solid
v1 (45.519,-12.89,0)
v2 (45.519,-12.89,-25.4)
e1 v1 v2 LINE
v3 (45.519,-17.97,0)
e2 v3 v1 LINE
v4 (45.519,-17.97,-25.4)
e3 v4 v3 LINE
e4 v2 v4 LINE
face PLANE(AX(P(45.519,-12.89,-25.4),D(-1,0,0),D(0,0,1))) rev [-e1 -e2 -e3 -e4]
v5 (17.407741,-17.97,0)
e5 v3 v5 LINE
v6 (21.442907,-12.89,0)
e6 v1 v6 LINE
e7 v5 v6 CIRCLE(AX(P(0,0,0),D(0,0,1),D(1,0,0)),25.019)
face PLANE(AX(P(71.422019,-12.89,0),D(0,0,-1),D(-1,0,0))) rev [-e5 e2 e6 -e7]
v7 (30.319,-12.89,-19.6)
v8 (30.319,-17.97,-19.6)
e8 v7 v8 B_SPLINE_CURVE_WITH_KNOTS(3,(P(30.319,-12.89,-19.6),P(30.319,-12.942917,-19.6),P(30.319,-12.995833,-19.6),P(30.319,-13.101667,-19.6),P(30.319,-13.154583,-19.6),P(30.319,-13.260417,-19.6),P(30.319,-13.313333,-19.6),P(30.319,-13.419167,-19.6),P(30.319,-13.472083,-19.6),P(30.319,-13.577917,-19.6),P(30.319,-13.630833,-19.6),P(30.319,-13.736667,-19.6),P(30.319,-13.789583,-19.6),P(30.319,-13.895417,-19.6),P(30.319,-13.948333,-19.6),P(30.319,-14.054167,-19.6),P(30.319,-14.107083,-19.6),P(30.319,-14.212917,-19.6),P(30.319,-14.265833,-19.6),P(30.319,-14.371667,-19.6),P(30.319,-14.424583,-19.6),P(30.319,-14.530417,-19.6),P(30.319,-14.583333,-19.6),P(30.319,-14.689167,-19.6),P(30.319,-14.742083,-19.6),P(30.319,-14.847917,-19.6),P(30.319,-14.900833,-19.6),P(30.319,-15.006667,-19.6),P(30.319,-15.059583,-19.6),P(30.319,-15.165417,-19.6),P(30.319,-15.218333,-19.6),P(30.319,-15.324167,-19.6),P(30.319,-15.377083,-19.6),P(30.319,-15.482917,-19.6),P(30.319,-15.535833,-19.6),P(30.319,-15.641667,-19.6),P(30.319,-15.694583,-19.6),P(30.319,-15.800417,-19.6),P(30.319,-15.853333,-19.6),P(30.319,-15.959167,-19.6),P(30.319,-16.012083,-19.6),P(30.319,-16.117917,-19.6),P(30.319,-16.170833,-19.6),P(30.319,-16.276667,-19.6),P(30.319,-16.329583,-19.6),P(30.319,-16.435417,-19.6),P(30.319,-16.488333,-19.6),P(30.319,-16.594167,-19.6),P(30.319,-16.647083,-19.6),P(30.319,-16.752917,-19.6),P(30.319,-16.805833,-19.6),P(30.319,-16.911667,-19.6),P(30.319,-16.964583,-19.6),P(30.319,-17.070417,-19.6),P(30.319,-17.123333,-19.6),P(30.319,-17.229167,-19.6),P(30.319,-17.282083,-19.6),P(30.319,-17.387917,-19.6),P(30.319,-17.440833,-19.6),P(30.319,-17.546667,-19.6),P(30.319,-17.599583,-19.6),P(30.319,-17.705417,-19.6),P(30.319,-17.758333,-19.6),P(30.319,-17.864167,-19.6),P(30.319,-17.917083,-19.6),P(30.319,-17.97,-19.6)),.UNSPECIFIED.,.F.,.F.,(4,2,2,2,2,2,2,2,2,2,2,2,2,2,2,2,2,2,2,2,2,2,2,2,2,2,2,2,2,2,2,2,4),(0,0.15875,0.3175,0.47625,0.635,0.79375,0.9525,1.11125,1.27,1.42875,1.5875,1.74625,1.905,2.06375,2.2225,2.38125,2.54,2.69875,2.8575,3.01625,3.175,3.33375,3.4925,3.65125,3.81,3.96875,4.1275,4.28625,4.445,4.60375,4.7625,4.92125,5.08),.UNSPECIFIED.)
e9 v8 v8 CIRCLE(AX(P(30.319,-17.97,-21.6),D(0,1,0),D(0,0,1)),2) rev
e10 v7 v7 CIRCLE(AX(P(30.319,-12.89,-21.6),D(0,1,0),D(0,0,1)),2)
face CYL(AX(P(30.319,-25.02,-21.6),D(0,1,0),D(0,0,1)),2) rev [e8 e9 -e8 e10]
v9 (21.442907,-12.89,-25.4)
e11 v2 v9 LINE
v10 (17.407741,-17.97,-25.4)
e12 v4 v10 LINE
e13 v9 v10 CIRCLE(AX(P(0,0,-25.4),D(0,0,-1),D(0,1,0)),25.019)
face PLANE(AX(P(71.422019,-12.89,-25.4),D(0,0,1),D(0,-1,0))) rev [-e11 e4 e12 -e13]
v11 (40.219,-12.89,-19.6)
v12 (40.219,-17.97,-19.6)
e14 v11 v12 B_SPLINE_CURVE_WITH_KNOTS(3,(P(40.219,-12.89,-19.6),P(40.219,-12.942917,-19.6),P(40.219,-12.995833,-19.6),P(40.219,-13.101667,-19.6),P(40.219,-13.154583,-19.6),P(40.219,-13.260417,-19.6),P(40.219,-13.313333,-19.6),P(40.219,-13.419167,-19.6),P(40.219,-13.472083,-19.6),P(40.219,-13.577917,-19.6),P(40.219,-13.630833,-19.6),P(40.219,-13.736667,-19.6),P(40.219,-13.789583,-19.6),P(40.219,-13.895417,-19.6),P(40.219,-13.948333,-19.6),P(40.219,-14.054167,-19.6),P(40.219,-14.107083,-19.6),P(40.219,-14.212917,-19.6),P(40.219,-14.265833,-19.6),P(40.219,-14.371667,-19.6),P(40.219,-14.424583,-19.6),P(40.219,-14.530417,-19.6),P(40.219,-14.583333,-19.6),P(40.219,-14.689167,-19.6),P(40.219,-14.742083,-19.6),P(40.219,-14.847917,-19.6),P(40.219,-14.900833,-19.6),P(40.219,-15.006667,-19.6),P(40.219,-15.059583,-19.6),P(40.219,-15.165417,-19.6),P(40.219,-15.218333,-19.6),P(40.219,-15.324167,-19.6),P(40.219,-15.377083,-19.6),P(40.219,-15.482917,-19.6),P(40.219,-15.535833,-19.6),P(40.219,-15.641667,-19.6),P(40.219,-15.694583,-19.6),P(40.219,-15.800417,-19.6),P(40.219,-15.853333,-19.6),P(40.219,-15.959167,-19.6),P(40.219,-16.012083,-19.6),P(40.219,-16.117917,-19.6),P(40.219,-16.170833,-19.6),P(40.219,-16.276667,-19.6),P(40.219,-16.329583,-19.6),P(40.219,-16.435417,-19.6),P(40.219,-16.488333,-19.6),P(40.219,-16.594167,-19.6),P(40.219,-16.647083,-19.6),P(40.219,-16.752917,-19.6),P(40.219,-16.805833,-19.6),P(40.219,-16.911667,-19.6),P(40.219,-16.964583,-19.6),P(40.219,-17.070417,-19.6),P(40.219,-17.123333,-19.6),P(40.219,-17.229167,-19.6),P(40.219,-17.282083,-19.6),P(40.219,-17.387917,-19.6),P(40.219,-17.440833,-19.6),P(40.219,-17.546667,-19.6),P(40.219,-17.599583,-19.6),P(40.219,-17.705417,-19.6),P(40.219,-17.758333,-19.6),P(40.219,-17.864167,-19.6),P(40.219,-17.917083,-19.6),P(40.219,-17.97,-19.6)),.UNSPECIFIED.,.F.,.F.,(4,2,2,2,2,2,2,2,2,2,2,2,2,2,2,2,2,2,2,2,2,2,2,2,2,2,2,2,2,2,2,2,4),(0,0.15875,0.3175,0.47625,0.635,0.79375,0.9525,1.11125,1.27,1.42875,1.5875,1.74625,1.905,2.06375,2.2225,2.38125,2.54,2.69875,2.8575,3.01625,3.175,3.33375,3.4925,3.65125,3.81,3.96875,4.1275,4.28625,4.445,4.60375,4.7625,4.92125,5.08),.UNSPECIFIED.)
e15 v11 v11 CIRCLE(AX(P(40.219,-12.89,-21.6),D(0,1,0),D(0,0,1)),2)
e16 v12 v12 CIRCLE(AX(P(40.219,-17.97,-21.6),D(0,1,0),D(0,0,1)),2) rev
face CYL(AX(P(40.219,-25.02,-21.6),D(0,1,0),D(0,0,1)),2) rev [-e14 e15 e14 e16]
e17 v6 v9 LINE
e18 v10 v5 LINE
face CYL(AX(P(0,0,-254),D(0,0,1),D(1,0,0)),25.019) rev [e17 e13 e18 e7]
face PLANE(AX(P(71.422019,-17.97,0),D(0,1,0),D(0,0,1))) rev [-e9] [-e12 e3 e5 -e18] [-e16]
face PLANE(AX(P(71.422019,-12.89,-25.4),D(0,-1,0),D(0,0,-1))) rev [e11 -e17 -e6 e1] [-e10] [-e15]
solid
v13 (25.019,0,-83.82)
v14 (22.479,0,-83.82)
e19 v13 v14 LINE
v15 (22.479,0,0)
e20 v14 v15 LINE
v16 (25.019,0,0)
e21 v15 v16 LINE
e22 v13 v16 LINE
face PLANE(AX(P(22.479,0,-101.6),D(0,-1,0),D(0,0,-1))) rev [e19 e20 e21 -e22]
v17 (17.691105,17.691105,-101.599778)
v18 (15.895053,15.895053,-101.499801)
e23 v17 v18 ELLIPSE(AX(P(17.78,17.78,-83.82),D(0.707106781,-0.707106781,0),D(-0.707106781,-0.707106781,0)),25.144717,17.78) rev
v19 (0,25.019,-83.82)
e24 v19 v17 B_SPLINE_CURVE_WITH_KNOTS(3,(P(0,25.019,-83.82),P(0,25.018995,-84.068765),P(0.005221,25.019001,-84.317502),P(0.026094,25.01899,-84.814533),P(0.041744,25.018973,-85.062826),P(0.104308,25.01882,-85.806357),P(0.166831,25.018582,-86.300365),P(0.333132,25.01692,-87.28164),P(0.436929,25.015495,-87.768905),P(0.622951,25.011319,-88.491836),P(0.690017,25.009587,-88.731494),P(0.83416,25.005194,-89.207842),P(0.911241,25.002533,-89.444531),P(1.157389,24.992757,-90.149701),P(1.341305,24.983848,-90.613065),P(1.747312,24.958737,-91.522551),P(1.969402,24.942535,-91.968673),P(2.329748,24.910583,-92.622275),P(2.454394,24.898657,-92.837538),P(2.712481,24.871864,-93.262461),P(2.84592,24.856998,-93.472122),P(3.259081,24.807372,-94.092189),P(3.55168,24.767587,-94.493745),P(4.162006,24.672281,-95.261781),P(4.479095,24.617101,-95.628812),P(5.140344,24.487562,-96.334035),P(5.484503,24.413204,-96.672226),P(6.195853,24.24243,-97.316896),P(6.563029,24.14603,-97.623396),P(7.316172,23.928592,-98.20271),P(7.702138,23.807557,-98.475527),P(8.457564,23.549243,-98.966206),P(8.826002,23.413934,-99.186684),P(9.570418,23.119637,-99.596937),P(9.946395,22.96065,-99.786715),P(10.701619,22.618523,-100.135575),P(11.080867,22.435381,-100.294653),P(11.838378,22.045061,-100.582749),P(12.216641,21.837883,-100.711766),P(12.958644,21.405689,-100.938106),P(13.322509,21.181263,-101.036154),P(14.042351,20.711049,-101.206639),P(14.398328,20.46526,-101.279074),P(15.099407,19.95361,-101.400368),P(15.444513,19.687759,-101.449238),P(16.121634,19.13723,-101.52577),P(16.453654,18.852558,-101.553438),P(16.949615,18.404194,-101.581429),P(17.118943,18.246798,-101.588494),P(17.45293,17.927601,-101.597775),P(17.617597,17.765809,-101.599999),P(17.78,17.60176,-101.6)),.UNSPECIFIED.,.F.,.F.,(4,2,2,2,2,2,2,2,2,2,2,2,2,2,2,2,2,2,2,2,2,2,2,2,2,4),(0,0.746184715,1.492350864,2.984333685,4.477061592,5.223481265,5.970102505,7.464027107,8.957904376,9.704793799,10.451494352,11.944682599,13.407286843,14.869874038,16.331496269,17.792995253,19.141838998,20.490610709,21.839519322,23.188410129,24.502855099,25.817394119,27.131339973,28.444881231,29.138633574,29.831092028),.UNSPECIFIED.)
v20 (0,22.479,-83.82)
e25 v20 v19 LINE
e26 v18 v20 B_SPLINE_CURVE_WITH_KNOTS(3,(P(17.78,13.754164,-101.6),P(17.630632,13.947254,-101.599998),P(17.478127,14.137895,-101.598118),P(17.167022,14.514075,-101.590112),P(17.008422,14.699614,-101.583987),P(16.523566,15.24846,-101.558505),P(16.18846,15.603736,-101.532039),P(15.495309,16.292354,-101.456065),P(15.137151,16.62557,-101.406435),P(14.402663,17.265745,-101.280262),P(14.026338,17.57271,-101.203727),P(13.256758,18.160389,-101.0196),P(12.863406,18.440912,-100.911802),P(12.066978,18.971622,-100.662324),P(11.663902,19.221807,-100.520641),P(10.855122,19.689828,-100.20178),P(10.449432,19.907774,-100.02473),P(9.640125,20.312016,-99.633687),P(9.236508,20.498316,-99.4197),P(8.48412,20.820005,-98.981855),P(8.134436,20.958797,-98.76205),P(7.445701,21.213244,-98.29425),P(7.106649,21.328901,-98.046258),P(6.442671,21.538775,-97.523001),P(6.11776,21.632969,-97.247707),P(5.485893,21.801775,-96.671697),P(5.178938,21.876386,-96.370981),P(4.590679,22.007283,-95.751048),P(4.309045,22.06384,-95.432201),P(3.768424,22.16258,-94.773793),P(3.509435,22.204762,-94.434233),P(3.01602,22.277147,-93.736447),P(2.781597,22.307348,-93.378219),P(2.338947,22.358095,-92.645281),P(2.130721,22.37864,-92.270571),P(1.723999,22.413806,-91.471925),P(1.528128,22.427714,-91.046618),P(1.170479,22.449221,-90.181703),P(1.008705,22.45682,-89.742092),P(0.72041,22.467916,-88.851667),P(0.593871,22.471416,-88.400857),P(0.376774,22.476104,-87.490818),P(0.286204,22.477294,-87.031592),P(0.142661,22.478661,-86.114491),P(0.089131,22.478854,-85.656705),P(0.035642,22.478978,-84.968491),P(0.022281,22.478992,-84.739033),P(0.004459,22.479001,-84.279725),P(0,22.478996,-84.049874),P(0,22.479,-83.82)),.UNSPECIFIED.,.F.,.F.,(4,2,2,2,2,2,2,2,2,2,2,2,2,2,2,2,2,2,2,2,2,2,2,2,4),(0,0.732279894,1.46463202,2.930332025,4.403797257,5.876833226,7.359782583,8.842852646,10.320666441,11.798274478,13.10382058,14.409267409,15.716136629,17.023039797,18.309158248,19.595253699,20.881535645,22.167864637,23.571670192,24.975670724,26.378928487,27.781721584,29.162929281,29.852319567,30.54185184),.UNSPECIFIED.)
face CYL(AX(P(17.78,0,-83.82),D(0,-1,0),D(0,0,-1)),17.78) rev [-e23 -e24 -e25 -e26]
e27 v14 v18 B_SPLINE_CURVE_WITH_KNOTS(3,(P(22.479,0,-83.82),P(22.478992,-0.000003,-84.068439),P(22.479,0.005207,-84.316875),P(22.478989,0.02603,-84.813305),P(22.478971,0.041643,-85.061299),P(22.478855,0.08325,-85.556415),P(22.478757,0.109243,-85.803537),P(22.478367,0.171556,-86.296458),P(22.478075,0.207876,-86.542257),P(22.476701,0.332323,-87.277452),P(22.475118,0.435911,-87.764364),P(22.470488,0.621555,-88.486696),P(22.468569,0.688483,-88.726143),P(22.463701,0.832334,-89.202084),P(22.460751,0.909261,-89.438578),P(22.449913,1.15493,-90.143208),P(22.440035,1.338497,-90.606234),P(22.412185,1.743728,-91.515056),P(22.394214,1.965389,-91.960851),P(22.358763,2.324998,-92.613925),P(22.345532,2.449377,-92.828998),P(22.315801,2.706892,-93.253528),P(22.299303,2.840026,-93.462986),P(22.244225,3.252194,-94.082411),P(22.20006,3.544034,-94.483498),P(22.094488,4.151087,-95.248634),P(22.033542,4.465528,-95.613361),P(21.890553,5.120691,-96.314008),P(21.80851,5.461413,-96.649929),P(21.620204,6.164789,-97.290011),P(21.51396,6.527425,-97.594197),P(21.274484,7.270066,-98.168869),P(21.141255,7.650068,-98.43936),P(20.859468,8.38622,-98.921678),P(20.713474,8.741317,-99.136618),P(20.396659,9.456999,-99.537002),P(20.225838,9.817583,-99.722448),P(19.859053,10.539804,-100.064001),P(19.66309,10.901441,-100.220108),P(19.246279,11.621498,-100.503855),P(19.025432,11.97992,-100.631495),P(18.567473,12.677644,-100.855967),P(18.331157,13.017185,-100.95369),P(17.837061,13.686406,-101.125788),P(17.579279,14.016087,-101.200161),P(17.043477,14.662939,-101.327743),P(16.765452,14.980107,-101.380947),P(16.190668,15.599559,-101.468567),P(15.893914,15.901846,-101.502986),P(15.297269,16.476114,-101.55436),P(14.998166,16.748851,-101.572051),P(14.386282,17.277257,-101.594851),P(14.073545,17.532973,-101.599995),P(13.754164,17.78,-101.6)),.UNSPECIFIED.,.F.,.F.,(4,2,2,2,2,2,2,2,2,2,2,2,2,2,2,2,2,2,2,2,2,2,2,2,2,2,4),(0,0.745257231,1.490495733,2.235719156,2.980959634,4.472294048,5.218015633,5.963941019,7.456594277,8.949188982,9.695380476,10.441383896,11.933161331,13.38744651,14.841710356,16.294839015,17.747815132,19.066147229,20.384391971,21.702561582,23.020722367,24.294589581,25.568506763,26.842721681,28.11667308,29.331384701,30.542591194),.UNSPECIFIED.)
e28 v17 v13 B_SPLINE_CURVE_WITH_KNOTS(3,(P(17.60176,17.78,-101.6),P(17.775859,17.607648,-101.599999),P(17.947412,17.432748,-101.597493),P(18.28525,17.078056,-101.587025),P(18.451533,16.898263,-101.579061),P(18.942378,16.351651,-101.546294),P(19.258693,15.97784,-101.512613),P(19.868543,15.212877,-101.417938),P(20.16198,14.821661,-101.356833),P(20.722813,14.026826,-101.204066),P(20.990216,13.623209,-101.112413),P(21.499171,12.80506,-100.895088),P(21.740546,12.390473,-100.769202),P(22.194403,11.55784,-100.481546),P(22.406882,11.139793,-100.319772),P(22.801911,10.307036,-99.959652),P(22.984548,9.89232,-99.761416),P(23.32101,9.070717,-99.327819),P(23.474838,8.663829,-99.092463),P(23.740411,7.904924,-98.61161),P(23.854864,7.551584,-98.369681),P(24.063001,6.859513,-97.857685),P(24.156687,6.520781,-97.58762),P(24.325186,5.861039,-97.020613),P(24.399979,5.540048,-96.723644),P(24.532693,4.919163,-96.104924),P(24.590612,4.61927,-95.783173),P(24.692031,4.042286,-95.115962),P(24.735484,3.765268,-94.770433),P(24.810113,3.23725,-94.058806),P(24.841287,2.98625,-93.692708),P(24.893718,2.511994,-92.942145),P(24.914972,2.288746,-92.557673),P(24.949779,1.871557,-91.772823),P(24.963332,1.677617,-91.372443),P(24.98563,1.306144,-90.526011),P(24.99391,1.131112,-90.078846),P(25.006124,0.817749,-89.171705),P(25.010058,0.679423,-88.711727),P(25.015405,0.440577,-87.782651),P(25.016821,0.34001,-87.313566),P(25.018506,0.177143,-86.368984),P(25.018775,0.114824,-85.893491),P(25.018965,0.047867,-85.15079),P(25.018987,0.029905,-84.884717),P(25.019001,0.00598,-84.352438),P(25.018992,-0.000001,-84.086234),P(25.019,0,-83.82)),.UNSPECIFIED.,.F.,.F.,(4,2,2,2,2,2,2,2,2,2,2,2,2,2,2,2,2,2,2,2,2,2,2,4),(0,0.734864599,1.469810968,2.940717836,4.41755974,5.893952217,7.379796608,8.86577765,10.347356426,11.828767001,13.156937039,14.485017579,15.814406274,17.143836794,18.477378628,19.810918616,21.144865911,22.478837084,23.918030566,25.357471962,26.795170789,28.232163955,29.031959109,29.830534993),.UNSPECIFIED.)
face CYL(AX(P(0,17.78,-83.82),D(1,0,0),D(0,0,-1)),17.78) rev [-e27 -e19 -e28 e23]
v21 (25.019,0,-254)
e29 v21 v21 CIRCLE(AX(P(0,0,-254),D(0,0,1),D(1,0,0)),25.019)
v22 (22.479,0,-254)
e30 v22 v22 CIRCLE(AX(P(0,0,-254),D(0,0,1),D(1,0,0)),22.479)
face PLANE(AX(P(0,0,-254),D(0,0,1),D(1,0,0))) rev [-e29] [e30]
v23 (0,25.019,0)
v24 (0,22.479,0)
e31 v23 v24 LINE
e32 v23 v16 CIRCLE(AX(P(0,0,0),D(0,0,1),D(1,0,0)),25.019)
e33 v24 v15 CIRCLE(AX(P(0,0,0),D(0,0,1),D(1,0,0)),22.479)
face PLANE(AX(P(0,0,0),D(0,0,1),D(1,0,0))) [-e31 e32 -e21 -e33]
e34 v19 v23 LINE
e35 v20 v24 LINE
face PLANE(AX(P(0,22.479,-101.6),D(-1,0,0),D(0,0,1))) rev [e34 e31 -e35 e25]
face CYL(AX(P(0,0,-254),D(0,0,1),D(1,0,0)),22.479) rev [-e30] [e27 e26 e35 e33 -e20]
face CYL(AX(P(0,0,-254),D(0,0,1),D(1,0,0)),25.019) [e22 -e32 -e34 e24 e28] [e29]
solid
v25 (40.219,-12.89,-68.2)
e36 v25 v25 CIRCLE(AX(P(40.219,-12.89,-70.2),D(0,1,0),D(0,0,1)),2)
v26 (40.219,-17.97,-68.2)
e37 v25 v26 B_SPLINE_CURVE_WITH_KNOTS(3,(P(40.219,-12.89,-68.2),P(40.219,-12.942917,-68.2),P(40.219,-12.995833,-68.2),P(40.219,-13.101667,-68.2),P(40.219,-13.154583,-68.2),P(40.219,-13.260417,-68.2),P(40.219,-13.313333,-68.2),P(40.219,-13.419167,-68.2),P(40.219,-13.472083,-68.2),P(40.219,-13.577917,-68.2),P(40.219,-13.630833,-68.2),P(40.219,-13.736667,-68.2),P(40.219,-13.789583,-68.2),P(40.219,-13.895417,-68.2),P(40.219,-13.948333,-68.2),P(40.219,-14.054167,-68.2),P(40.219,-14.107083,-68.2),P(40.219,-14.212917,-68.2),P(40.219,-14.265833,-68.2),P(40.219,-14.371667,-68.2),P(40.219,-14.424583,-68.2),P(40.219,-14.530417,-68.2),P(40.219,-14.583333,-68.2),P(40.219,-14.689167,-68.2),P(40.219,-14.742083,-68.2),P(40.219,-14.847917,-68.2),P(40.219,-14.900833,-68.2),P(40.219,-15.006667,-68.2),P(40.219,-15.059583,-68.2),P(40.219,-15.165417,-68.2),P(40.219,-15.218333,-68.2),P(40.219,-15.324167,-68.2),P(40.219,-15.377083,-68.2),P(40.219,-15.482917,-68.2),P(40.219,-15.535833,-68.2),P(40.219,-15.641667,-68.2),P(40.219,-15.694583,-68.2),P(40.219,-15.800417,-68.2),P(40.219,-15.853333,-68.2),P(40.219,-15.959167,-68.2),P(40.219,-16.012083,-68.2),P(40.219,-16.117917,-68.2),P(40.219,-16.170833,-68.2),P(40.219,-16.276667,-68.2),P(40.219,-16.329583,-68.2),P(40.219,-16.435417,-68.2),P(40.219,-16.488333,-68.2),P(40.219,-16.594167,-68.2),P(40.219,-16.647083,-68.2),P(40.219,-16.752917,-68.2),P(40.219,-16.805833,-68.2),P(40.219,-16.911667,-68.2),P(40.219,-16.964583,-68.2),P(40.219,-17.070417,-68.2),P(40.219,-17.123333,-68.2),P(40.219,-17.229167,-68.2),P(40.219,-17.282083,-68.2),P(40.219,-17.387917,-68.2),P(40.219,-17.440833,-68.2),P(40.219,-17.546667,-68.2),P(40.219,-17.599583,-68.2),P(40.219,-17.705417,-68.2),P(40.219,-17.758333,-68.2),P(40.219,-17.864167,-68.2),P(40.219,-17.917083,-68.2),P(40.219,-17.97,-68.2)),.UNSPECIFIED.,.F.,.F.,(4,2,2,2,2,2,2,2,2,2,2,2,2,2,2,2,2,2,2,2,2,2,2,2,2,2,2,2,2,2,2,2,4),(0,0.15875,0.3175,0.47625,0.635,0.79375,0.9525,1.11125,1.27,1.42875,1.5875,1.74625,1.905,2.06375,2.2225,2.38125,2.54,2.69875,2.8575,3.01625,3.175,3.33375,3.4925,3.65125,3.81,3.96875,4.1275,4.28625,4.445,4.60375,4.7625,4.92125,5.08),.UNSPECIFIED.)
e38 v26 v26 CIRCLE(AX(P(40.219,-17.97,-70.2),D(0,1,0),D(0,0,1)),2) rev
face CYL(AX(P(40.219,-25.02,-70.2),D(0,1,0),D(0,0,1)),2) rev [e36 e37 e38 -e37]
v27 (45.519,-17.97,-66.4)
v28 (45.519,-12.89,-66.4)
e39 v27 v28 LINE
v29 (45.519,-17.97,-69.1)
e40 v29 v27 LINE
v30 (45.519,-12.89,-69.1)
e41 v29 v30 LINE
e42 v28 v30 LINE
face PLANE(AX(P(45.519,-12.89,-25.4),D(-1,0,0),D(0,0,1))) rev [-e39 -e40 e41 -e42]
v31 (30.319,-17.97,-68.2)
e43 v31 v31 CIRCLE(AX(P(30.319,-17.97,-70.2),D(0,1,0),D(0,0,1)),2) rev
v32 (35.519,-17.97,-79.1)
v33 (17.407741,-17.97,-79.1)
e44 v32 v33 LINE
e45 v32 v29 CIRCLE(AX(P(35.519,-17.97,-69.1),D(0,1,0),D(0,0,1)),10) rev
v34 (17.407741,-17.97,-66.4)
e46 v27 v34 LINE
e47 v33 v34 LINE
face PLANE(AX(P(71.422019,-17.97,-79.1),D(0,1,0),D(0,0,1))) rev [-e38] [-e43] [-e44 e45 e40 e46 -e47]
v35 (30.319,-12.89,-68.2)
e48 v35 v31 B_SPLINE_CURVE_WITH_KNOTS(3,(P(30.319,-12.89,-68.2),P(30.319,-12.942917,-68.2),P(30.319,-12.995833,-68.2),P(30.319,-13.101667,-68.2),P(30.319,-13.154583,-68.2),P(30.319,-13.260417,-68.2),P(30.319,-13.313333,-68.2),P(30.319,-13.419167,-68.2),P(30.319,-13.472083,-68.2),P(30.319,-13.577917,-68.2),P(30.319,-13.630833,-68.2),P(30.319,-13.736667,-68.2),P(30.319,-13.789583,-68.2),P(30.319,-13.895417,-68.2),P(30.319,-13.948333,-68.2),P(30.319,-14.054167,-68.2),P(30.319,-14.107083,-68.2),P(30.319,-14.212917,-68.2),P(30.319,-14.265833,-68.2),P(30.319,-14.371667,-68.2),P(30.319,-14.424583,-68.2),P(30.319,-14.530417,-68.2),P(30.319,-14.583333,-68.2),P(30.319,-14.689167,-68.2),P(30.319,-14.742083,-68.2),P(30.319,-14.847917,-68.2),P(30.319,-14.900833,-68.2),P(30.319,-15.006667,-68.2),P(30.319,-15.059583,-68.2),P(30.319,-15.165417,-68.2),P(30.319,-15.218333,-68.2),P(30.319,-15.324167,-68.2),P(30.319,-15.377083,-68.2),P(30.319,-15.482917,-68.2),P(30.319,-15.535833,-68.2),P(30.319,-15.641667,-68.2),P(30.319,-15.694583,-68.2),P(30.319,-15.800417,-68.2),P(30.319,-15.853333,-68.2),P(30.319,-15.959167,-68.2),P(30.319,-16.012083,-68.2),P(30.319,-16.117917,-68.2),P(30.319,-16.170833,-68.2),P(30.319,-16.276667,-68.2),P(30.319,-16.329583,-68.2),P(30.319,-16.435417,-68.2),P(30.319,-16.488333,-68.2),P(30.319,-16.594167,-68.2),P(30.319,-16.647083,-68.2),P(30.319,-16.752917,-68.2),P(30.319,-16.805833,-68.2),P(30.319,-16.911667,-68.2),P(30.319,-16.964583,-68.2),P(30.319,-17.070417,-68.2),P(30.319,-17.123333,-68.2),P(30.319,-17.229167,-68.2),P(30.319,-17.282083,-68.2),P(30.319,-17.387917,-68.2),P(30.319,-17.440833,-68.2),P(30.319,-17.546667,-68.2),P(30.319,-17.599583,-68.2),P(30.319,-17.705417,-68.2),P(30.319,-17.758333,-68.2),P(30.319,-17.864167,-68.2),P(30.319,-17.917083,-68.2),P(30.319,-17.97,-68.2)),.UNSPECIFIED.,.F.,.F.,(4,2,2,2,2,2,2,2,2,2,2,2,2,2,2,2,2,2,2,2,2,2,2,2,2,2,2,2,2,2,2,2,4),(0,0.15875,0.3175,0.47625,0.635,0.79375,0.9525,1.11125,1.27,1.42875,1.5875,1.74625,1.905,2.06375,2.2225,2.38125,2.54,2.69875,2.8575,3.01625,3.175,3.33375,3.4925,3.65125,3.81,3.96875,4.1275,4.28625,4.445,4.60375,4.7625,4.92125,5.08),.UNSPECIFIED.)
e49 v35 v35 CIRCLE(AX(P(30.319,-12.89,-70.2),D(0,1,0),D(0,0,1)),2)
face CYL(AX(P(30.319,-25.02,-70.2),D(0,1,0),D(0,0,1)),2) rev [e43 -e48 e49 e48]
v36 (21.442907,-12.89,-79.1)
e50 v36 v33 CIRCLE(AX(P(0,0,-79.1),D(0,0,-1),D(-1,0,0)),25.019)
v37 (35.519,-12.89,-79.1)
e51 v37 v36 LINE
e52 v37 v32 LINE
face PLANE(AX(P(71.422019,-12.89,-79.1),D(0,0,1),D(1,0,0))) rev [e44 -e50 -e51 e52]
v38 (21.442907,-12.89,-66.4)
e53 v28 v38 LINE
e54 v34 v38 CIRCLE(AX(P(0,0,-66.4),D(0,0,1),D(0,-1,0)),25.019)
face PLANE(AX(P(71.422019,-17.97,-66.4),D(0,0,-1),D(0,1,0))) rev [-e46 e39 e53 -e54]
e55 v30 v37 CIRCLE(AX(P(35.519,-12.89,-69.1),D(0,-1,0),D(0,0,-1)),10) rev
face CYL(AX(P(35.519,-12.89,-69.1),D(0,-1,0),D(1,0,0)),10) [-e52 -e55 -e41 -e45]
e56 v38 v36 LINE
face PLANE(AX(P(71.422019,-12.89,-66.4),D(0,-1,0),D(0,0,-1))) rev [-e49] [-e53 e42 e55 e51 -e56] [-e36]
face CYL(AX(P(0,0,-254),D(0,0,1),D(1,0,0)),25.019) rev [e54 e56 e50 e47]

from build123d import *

# Parameters (mm, degrees)
SKETCH1_R                            = 25.019
SKETCH1_R_2                          = 22.479
BOSS_EXTRUDE1_DEPTH                  = 254
CUT_EXTRUDE1_DEPTH                   = 101.6
SKETCH3_W                            = 25.4
SKETCH3_H                            = 5.08
SKETCH3_W_2                          = 12.7
BOSS_EXTRUDE2_DEPTH                  = 20.5
BOSS_EXTRUDE2_DIRECTION_2_REACH      = 262.088
BOSS_EXTRUDE2_DIRECTION_2_END_RADIUS = 25.019
FILLET3_R                            = 17.78
SKETCH4_R                            = 2
CUT_EXTRUDE2_DEPTH                   = 5.08
FILLET4_R                            = 10


with BuildPart() as part:
    # Sketch1 → Boss-Extrude1 (new body)
    with BuildSketch(Plane.XY):
        Circle(SKETCH1_R)
        Circle(SKETCH1_R_2, mode=Mode.SUBTRACT)
    extrude(amount=-BOSS_EXTRUDE1_DEPTH)

    # Sketch2 → Cut-Extrude1 (cut)
    with BuildSketch(Plane.XY):
        with BuildLine():
            Line((0, 22.479), (0, 25.019))
            ThreePointArc((0, 25.019), (17.691104559, 17.691104559), (25.019, 0))
            Line((25.019, 0), (22.479, 0))
            ThreePointArc((22.479, 0), (15.895053334, 15.895053334), (0, 22.479))
        make_face()
    extrude(amount=-CUT_EXTRUDE1_DEPTH, mode=Mode.SUBTRACT)

    # Fillet3
    # the kernel refuses this fillet: 17.78 mm, written as the material it adds along each edge
    with BuildSketch(Plane(origin=(69.469, 0, -101.6), x_dir=(0, 0, 1), z_dir=(-1, 0, 0))) as fillet3_piece_1_section:
        with BuildLine():
            CenterArc((FILLET3_R, FILLET3_R), FILLET3_R, 180, 90)
            Line((0, FILLET3_R), (0, 0))
            Line((0, 0), (FILLET3_R, 0))
        make_face()
    fillet3_piece_1 = extrude(amount=91.44, mode=Mode.PRIVATE)
    fillet3_piece_1 = fillet3_piece_1 & Plane(origin=(0, 0, -97.674052769), x_dir=(1, 0, 0), z_dir=(0, 0, 1)) * Cylinder(25.019, 254, mode=Mode.PRIVATE)
    fillet3_piece_1 = fillet3_piece_1 - Plane(origin=(0, 0, -97.674052769), x_dir=(1, 0, 0), z_dir=(0, 0, 1)) * Cylinder(22.479, 254, mode=Mode.PRIVATE)
    add(fillet3_piece_1)
    with BuildSketch(Plane(origin=(0, -21.971, -101.6), x_dir=(1, 0, 0), z_dir=(0, 1, 0))) as fillet3_piece_2_section:
        with BuildLine():
            CenterArc((FILLET3_R, -FILLET3_R), FILLET3_R, 90, 90)
            Line((0, -FILLET3_R), (0, 0))
            Line((0, 0), (FILLET3_R, 0))
        make_face()
    fillet3_piece_2 = extrude(amount=91.44, mode=Mode.PRIVATE)
    fillet3_piece_2 = fillet3_piece_2 & Plane(origin=(0, 0, -100.962112939), x_dir=(1, 0, 0), z_dir=(0, 0, 1)) * Cylinder(25.019, 254, mode=Mode.PRIVATE)
    fillet3_piece_2 = fillet3_piece_2 - Plane(origin=(0, 0, -100.962112939), x_dir=(1, 0, 0), z_dir=(0, 0, 1)) * Cylinder(22.479, 254, mode=Mode.PRIVATE)
    add(fillet3_piece_2)


with BuildPart() as body_2:
    # Sketch3 → Boss-Extrude2 (new body)
    with BuildSketch(Plane(origin=(25.019, 0, 0), x_dir=(0, 0, -1), z_dir=(1, 0, 0))):
        with Locations((12.7, -15.43)):
            Rectangle(SKETCH3_W, SKETCH3_H)
        with Locations((72.75, -15.43)):
            Rectangle(SKETCH3_W_2, SKETCH3_H)
    extrude(amount=BOSS_EXTRUDE2_DEPTH)

    # Boss-Extrude2 direction 2: up to this cylinder (the profile starts outside it)
    boss_extrude2_direction_2_end = Plane(origin=(0, 0, -42.725), z_dir=(0, 0, 1)) * Cylinder(BOSS_EXTRUDE2_DIRECTION_2_END_RADIUS, 635.264, mode=Mode.PRIVATE)
    # Sketch3 → Boss-Extrude2 direction 2 (add, up to the surface)
    with BuildSketch(Plane(origin=(25.019, 0, 0), x_dir=(0, 0, -1), z_dir=(1, 0, 0)), mode=Mode.PRIVATE) as boss_extrude2_direction_2_sk1:
        with Locations((12.7, -15.43)):
            Rectangle(SKETCH3_W, SKETCH3_H)
    boss_extrude2_direction_2_tool1 = extrude(boss_extrude2_direction_2_sk1.sketch, amount=-BOSS_EXTRUDE2_DIRECTION_2_REACH, mode=Mode.PRIVATE) - boss_extrude2_direction_2_end
    add(boss_extrude2_direction_2_tool1.solids().sort_by_distance((25.019, -15.43, -12.7))[0])
    # Sketch3 → Boss-Extrude2 direction 2 (add, up to the surface)
    with BuildSketch(Plane(origin=(25.019, 0, 0), x_dir=(0, 0, -1), z_dir=(1, 0, 0)), mode=Mode.PRIVATE) as boss_extrude2_direction_2_sk2:
        with Locations((72.75, -15.43)):
            Rectangle(SKETCH3_W_2, SKETCH3_H)
    boss_extrude2_direction_2_tool2 = extrude(boss_extrude2_direction_2_sk2.sketch, amount=-BOSS_EXTRUDE2_DIRECTION_2_REACH, mode=Mode.PRIVATE) - boss_extrude2_direction_2_end
    add(boss_extrude2_direction_2_tool2.solids().sort_by_distance((25.019, -15.43, -72.75))[0])

    # Sketch4 → Cut-Extrude2 (cut)
    with BuildSketch(Plane(origin=(0, -12.89, 0), x_dir=(1, 0, 0), z_dir=(0, 1, 0))):
        with Locations(Location((30.319, 70.2, 0), (0, 0, 270))):
            Circle(SKETCH4_R)
        with Locations(Location((40.219, 70.2, 0), (0, 0, 270))):
            Circle(SKETCH4_R)
        with Locations(Location((30.319, 21.6, 0), (0, 0, 270))):
            Circle(SKETCH4_R)
        with Locations(Location((40.219, 21.6, 0), (0, 0, 270))):
            Circle(SKETCH4_R)
    extrude(amount=-CUT_EXTRUDE2_DEPTH, mode=Mode.SUBTRACT)

    # Fillet4
    fillet4_edges = [body_2.edges().sort_by_distance(p)[0] for p in [
        (45.519, -15.43, -79.1),
    ]]
    fillet(fillet4_edges, radius=FILLET4_R)


solid = Compound([part.part, body_2.part])
